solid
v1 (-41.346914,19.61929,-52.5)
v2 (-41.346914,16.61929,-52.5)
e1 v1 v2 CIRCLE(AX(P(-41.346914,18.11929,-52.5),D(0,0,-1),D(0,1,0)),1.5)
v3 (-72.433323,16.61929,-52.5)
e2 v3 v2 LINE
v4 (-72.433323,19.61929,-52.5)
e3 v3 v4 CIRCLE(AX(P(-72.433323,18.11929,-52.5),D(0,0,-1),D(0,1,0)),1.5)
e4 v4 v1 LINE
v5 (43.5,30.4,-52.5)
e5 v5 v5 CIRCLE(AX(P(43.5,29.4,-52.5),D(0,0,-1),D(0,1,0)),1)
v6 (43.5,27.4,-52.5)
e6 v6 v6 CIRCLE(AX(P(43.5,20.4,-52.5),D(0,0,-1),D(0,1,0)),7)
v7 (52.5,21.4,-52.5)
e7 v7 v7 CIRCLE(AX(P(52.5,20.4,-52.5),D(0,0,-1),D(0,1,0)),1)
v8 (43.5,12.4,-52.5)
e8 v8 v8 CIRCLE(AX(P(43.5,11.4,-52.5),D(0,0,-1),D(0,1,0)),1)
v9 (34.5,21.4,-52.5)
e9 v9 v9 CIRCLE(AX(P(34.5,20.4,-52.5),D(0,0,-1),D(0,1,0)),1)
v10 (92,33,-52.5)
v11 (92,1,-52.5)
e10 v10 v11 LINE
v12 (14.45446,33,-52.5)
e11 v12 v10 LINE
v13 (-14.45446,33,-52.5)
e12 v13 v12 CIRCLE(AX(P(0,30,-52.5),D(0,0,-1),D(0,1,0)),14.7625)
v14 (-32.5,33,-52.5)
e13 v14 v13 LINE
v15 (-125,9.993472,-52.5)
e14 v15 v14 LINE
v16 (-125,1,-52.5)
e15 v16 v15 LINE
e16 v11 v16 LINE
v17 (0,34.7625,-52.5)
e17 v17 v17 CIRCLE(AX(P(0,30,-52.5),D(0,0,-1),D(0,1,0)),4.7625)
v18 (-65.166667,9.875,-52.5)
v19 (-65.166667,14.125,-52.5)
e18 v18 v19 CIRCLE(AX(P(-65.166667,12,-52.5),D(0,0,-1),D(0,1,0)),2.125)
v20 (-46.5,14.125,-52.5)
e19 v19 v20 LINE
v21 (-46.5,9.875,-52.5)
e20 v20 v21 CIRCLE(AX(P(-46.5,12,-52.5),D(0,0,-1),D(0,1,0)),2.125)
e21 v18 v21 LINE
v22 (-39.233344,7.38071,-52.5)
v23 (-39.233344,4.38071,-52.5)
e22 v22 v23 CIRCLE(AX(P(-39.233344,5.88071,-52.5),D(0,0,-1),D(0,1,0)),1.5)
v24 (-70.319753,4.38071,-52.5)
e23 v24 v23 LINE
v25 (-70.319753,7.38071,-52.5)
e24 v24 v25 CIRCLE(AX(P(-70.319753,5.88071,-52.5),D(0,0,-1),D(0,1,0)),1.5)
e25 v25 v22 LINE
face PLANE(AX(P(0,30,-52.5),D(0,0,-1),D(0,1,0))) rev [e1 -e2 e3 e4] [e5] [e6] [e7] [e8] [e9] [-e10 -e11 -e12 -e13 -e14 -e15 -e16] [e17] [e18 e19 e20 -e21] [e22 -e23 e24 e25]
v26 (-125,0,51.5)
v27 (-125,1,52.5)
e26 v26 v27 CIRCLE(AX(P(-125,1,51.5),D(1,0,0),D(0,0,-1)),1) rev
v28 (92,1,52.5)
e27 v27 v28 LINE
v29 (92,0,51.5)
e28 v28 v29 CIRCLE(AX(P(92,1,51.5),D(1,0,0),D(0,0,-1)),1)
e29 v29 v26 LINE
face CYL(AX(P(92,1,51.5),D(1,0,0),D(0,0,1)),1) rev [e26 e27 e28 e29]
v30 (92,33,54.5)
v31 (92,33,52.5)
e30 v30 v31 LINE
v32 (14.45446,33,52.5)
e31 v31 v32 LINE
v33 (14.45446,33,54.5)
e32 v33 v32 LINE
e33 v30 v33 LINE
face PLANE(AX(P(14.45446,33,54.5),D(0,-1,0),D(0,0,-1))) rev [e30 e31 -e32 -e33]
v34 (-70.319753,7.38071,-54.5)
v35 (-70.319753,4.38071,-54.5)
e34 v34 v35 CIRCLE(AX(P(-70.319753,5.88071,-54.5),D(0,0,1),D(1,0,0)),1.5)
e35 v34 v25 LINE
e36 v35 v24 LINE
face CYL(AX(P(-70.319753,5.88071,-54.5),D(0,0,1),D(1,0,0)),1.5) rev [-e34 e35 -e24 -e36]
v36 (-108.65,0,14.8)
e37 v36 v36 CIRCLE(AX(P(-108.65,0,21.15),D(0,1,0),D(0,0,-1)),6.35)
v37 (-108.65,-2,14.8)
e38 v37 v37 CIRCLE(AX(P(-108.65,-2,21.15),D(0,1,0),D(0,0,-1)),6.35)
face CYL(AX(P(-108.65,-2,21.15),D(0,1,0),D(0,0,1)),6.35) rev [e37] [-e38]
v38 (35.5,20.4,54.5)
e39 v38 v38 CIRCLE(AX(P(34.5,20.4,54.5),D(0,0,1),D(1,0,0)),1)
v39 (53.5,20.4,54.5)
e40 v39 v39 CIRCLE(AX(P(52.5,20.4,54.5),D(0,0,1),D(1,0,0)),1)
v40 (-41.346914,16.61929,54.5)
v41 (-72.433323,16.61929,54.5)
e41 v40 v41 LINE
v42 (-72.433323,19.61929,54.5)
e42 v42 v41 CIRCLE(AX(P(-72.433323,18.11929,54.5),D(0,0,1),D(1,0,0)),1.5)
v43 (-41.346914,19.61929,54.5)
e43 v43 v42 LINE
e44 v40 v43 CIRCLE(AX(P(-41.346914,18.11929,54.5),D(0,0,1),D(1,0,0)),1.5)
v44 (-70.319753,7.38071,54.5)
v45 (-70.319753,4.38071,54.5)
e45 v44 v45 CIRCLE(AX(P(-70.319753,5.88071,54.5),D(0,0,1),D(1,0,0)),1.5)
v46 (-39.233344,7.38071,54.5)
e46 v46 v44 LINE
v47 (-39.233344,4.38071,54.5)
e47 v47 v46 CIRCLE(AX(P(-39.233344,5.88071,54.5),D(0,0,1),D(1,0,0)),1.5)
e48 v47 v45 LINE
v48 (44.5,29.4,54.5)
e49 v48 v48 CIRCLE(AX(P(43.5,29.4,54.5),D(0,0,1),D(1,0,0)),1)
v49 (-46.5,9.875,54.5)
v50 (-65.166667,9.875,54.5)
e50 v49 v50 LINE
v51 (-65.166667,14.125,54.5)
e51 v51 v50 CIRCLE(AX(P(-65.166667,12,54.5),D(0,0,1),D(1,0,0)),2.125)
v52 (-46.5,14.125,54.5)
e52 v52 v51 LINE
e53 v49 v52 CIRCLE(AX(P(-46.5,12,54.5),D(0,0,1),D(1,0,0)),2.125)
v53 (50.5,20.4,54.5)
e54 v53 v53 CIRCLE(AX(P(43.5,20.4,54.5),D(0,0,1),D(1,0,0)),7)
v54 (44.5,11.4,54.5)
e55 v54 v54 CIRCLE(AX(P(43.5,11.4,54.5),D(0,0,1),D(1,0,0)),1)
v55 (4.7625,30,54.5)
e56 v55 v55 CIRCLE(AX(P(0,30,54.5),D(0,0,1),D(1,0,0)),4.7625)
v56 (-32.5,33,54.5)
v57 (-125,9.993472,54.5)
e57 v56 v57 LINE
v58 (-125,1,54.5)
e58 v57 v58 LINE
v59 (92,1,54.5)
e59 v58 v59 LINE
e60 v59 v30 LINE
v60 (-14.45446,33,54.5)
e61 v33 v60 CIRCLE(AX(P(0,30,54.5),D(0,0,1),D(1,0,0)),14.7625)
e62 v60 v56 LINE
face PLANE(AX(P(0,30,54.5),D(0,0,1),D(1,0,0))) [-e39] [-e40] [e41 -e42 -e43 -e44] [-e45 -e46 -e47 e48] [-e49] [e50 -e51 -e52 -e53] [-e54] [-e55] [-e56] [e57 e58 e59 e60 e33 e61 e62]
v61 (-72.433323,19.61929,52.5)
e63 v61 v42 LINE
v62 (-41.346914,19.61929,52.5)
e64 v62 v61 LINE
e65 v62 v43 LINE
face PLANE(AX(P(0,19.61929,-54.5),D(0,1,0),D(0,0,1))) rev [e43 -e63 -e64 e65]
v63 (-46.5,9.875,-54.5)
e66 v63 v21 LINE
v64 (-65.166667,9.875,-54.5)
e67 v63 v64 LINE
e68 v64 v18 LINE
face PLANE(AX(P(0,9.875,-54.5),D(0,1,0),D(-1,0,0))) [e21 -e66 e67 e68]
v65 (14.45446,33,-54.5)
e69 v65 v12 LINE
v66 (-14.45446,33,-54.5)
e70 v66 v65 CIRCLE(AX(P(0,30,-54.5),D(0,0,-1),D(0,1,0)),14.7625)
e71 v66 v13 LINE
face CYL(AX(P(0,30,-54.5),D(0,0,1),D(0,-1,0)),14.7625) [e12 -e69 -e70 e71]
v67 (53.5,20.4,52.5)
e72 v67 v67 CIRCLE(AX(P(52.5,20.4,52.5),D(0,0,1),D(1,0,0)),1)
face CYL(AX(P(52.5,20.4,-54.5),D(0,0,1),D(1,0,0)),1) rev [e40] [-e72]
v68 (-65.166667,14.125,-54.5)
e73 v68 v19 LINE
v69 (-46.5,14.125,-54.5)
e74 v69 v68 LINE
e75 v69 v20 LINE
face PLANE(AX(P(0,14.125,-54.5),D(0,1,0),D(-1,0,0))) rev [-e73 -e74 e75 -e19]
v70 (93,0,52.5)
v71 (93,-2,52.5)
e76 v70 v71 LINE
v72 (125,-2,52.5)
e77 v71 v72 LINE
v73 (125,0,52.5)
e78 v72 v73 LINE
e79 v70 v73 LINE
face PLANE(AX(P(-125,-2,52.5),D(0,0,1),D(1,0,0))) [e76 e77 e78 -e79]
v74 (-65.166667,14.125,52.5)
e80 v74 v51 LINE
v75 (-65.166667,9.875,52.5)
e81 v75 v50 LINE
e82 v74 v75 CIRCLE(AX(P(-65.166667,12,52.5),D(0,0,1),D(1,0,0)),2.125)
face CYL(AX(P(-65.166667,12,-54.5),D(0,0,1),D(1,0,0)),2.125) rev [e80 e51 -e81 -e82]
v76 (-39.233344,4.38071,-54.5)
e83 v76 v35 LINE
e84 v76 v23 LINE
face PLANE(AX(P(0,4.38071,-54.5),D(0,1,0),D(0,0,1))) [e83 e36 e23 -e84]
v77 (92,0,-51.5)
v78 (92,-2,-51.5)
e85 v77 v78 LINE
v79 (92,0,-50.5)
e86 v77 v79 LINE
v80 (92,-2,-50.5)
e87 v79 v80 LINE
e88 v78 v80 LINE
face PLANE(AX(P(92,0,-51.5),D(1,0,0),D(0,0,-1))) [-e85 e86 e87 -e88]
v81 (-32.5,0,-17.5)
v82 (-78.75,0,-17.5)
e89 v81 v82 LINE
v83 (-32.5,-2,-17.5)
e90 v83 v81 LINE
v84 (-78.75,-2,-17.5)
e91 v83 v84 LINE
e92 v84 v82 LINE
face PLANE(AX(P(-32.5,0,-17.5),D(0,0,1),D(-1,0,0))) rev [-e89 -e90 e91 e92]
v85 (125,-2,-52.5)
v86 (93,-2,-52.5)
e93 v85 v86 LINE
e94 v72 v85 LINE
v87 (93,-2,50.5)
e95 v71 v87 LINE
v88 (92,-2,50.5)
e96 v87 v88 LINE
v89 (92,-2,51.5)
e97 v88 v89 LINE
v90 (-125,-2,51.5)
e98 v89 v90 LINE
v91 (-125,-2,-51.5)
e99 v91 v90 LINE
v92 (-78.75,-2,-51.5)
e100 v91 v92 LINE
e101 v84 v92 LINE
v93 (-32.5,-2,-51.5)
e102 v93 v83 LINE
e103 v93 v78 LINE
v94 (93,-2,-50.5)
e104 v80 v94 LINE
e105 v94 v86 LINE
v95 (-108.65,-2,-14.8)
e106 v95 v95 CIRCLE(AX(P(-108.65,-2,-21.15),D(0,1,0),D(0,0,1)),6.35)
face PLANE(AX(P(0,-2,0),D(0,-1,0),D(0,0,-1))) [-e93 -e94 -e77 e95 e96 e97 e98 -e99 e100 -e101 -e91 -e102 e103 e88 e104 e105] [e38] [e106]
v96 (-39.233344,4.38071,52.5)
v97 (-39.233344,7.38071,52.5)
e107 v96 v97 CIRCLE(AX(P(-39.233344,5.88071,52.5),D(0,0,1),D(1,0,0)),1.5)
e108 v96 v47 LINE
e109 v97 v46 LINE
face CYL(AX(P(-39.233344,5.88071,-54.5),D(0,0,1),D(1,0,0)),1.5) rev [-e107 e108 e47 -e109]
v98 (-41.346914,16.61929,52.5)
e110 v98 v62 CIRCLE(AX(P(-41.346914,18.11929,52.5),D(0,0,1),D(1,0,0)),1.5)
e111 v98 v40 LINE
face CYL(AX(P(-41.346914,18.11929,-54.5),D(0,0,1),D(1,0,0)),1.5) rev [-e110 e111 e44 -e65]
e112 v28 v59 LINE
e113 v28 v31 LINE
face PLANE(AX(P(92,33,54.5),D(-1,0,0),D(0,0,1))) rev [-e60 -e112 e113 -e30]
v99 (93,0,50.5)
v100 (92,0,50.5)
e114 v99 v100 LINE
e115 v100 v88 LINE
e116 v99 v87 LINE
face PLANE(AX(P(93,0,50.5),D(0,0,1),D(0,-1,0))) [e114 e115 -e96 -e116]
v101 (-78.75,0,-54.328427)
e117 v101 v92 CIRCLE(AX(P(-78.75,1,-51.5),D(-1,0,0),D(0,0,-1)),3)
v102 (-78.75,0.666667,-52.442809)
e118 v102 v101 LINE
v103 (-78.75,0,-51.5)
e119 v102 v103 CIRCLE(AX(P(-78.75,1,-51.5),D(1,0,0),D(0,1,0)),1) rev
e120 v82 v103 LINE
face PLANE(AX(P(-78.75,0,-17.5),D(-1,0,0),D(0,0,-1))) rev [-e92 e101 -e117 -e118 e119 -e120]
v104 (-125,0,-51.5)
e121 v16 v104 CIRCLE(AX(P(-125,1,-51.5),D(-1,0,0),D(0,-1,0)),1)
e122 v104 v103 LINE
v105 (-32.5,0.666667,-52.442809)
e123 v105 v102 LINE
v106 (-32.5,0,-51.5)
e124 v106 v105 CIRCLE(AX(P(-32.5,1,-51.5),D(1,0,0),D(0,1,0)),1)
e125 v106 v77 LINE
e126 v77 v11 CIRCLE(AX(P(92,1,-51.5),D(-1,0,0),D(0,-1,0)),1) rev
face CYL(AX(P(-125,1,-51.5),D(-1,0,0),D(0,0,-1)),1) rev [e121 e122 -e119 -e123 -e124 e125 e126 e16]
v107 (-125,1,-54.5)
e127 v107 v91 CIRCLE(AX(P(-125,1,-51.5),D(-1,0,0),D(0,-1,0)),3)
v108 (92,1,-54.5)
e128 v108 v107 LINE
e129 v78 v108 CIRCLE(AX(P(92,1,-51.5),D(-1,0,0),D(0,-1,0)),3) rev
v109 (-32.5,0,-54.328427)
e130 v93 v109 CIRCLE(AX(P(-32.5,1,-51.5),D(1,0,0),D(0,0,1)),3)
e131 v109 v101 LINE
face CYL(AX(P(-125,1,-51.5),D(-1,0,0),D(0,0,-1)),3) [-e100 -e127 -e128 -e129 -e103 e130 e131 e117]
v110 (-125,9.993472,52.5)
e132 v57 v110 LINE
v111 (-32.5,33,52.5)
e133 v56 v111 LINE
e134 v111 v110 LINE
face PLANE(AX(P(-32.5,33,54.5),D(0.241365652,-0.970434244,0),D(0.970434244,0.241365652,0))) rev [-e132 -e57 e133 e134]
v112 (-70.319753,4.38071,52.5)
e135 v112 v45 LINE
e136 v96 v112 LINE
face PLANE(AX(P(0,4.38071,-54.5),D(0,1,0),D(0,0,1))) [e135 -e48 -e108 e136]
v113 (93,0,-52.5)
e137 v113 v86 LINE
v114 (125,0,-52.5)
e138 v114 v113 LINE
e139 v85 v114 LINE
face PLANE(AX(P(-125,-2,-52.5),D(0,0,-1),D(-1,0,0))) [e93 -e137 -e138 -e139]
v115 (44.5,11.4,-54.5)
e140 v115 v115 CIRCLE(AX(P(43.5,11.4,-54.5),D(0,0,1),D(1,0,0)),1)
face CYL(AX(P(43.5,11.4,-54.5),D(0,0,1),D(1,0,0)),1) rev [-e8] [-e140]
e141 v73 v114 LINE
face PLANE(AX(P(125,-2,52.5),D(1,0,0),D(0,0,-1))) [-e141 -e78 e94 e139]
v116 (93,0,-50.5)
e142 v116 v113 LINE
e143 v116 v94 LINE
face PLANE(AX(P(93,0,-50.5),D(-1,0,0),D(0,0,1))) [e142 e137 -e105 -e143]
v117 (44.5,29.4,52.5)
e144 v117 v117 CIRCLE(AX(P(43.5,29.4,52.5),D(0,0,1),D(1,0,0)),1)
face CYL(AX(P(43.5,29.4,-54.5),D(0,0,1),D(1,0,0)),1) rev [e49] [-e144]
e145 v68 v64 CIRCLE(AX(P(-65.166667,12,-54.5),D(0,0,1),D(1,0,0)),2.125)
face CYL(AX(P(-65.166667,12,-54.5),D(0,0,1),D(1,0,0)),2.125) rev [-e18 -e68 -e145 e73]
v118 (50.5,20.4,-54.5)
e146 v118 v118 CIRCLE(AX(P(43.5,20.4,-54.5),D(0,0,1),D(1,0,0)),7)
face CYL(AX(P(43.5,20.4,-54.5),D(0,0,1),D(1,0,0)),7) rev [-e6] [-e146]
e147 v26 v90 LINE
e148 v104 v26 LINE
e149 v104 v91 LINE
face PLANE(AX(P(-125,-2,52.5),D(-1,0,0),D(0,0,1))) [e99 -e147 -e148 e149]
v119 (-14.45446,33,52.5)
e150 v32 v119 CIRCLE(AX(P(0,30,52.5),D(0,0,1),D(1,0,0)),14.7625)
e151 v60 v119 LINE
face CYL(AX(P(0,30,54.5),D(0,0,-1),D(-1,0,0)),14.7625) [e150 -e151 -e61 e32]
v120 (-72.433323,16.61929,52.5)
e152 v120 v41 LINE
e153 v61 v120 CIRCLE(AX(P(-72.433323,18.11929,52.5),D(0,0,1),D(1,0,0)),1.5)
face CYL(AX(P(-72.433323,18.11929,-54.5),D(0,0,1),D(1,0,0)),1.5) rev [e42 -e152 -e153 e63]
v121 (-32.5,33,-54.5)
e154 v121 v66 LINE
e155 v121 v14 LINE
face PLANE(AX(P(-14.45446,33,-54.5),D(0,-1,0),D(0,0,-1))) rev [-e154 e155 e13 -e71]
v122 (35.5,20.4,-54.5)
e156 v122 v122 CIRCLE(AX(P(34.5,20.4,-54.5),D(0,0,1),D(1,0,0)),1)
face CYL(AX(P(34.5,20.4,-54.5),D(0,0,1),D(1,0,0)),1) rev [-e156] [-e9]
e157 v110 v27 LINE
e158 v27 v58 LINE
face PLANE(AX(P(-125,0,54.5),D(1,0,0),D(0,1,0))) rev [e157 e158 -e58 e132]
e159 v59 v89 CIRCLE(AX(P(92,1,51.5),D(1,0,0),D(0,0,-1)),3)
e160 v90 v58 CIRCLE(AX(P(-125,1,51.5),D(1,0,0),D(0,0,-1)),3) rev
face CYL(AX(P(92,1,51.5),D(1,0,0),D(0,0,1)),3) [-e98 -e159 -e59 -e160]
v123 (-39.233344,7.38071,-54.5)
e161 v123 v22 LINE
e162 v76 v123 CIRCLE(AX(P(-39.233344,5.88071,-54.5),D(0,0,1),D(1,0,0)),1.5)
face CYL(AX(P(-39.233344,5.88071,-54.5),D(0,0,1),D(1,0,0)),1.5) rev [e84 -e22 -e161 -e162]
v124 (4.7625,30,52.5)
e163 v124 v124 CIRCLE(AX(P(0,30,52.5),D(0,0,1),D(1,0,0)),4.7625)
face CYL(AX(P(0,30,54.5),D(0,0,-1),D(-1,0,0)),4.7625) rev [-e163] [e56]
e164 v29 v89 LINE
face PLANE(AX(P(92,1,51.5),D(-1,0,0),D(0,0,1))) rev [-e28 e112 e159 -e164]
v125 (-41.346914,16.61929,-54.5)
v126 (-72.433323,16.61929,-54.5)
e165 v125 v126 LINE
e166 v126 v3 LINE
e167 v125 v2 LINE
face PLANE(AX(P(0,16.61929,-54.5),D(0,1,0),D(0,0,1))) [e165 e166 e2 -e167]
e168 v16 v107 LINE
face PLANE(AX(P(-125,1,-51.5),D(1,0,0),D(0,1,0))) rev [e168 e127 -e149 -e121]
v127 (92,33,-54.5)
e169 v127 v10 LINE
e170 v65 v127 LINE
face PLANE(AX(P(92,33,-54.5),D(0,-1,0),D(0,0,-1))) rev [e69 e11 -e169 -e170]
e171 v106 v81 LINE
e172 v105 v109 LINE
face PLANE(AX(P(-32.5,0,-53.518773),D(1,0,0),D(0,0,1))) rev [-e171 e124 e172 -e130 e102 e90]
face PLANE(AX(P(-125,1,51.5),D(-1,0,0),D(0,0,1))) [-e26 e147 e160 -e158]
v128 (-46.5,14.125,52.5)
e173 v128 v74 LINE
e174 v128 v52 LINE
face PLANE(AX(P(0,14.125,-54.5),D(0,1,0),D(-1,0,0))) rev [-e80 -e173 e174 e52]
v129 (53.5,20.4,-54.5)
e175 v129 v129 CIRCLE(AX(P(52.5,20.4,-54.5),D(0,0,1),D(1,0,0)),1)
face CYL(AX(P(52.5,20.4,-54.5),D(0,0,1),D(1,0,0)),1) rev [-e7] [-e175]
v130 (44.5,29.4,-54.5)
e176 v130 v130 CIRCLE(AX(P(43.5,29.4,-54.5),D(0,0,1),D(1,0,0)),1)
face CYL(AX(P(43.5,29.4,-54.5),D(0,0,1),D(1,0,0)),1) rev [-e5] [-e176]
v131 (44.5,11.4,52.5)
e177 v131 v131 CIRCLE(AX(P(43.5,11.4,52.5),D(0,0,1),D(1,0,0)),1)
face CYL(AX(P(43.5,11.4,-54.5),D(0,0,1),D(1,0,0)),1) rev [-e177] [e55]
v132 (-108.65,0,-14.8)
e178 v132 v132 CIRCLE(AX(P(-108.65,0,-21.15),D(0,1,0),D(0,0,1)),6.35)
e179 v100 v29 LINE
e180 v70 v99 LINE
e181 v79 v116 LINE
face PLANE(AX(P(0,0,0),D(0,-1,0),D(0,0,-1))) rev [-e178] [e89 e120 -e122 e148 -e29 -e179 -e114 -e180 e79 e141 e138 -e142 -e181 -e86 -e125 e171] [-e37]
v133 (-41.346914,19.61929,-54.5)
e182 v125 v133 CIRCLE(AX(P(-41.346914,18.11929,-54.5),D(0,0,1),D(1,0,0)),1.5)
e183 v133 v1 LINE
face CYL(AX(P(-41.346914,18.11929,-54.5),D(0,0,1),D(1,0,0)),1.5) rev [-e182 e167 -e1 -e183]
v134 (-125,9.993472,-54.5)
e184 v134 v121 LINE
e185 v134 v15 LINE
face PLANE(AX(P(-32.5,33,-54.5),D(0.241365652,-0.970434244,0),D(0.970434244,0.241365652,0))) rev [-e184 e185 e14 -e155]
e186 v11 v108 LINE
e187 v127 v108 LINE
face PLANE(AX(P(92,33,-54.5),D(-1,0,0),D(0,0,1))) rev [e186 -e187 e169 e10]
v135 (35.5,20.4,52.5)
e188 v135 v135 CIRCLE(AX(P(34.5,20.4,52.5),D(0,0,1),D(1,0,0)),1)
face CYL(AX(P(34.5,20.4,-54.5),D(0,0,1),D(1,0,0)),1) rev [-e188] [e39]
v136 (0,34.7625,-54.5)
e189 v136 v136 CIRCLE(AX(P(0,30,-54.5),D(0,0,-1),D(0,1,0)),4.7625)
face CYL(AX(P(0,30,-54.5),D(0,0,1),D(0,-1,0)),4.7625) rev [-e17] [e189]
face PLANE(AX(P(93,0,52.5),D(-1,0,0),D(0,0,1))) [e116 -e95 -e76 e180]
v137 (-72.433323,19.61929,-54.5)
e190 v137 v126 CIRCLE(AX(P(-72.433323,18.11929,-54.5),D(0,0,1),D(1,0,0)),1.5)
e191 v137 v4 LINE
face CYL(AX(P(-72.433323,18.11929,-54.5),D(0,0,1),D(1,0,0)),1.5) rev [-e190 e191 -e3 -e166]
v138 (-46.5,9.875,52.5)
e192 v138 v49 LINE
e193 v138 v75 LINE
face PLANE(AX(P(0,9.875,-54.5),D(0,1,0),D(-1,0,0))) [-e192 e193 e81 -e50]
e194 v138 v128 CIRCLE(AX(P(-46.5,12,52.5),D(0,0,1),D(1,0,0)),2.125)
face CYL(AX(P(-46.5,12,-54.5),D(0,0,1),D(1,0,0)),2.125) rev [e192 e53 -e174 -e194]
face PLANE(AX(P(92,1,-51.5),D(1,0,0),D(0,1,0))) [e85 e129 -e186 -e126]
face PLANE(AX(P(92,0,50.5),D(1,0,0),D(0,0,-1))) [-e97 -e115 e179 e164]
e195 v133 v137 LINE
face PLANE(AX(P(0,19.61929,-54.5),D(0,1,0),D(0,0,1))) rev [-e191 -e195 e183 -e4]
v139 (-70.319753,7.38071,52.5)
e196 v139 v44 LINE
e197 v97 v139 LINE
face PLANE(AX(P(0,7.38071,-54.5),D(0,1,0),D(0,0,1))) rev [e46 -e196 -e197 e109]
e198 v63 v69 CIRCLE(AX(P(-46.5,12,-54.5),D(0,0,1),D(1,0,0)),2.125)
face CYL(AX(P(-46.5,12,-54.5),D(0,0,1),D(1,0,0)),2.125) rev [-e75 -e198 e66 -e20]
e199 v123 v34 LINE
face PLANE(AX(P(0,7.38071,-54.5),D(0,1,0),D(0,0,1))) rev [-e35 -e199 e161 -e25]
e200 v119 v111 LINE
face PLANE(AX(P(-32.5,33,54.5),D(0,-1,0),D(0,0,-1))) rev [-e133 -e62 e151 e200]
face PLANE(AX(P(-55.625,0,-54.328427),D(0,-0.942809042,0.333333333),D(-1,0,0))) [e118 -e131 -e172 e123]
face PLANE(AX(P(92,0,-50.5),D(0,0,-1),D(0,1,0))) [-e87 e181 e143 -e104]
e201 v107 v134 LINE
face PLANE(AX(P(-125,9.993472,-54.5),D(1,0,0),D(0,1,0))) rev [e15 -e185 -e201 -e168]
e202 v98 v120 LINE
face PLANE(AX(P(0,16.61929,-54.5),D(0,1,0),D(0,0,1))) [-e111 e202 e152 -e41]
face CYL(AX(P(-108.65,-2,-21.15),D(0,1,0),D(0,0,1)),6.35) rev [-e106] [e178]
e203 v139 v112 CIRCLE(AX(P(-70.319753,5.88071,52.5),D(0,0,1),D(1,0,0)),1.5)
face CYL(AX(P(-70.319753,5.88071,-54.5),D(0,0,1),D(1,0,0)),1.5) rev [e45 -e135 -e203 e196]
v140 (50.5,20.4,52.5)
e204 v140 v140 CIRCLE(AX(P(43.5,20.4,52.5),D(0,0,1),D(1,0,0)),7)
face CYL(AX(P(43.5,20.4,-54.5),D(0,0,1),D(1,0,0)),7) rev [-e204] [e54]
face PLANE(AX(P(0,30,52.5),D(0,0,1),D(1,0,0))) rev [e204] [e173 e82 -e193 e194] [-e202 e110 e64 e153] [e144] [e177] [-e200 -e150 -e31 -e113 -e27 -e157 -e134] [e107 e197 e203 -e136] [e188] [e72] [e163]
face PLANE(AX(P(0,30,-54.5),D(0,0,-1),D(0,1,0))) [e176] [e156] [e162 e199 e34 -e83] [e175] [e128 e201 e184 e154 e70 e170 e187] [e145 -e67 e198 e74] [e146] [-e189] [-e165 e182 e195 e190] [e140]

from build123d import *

# Parameters (mm, degrees)
SKETCH3_W                       = 250
SKETCH3_H                       = 105
SKETCH3_R                       = 6.35
BASE_FLANGE1_DEPTH              = 2
EDGE_FLANGE1_STRIP_W            = 10
EDGE_FLANGE1_STRIP_H            = 2
EDGE_FLANGE1_STRIP_CUT_DEPTH    = 217
EDGE_FLANGE1_RELIEF_W           = 11
EDGE_FLANGE1_RELIEF_H           = 1
EDGE_FLANGE1_RELIEF_CUT_DEPTH   = 2
EDGE_FLANGE1_STRIP_2_W          = 10
EDGE_FLANGE1_STRIP_2_H          = 2
EDGE_FLANGE1_STRIP_CUT_2_DEPTH  = 217
EDGE_FLANGE1_RELIEF_2_W         = 11
EDGE_FLANGE1_RELIEF_2_H         = 1
EDGE_FLANGE1_RELIEF_CUT_2_DEPTH = 2
EDGE_FLANGE1_DEPTH              = 217
EDGE_FLANGE1_START              = 2
EDGE_FLANGE1_PROFILE_R          = 4.7625
EDGE_FLANGE1_FLAT_DEPTH         = 2
EDGE_FLANGE1_BEND_DEPTH         = 217
EDGE_FLANGE1_PROFILE_2_R        = 4.7625
EDGE_FLANGE1_FLAT_2_DEPTH       = 2
CUT_EXTRUDE2_START              = -78.75
CUT_EXTRUDE2_DEPTH              = 46.25
CUT_EXTRUDE1_DEPTH              = 144.523278273
CUT_EXTRUDE1_DEPTH_BACK         = 144.523278273
SKETCH14_R                      = 1
SKETCH14_R_2                    = 7


# Read off the part's stored shape, not the designer's step: Cut-Extrude2
# Sheet-metal steps are written as plain solids
with BuildPart() as part:
    # Sketch3 → Base-Flange1 (new body)
    with BuildSketch(Plane(origin=(0, 0, 0), x_dir=(1, 0, 0), z_dir=(0, 1, 0))):
        Rectangle(SKETCH3_W, SKETCH3_H)
        with Locations(Location((-108.65, 21.15, 0), (0, 0, 270))):
            Circle(SKETCH3_R, mode=Mode.SUBTRACT)
        with Locations(Location((-108.65, -21.15, 0), (0, 0, 90))):
            Circle(SKETCH3_R, mode=Mode.SUBTRACT)
    extrude(amount=-BASE_FLANGE1_DEPTH)

    # Edge-Flange1 strip (across the edge) → Edge-Flange1 strip cut (cut)
    with BuildSketch(Plane(origin=(-125, 0, 52.5), x_dir=(0, 0, -1), z_dir=(1, 0, 0))):
        with Locations((-4, -1)):
            Rectangle(EDGE_FLANGE1_STRIP_W, EDGE_FLANGE1_STRIP_H)
    extrude(amount=EDGE_FLANGE1_STRIP_CUT_DEPTH, mode=Mode.SUBTRACT)

    # Edge-Flange1 relief (on the sheet) → Edge-Flange1 relief cut (cut)
    with BuildSketch(Plane(origin=(-125, 0, 51.5), x_dir=(0, 0, -1), z_dir=(0, 1, 0))):
        with Locations((-4.5, -217.5)):
            Rectangle(EDGE_FLANGE1_RELIEF_W, EDGE_FLANGE1_RELIEF_H)
    extrude(amount=-EDGE_FLANGE1_RELIEF_CUT_DEPTH, mode=Mode.SUBTRACT)

    # Edge-Flange1 strip 2 (across the edge) → Edge-Flange1 strip cut 2 (cut)
    with BuildSketch(Plane(origin=(92, 0, -52.5), x_dir=(0, 0, 1), z_dir=(-1, 0, 0))):
        with Locations((-4, -1)):
            Rectangle(EDGE_FLANGE1_STRIP_2_W, EDGE_FLANGE1_STRIP_2_H)
    extrude(amount=EDGE_FLANGE1_STRIP_CUT_2_DEPTH, mode=Mode.SUBTRACT)

    # Edge-Flange1 relief 2 (on the sheet) → Edge-Flange1 relief cut 2 (cut)
    with BuildSketch(Plane(origin=(92, 0, -51.5), x_dir=(0, 0, 1), z_dir=(0, 1, 0))):
        with Locations((-4.5, 0.5)):
            Rectangle(EDGE_FLANGE1_RELIEF_2_W, EDGE_FLANGE1_RELIEF_2_H)
    extrude(amount=-EDGE_FLANGE1_RELIEF_CUT_2_DEPTH, mode=Mode.SUBTRACT)

    # Edge-Flange1 bend section (across the edge) → Edge-Flange1 (add)
    with BuildSketch(Plane(origin=(-125, 0, 52.5), x_dir=(0, 0, -1), z_dir=(1, 0, 0))):
        with BuildLine():
            Line((-2, 1), (0, 1))
            ThreePointArc((0, 1), (0.292893219, 0.292893219), (1, 0))
            Line((1, 0), (1, -2))
            ThreePointArc((1, -2), (-1.121320344, -1.121320344), (-2, 1))
        make_face()
    extrude(amount=EDGE_FLANGE1_DEPTH)

    # Edge-Flange1 profile (on flange) → Edge-Flange1 flat (add)
    with BuildSketch(Plane.XY.offset(52.5).offset(EDGE_FLANGE1_START)):
        with BuildLine():
            Line((-125, 9.993471807), (-125, 1))
            Line((-125, 1), (92, 1))
            Line((92, 1), (92, 33))
            Line((92, 33), (14.454459736, 33))
            ThreePointArc((14.454459736, 33), (0, 44.7625), (-14.454459736, 33))
            Line((-14.454459736, 33), (-32.5, 33))
            Line((-32.5, 33), (-125, 9.993471807))
        make_face()
        with Locations((0, 30)):
            Circle(EDGE_FLANGE1_PROFILE_R, mode=Mode.SUBTRACT)
    extrude(amount=-EDGE_FLANGE1_FLAT_DEPTH)

    # Edge-Flange1 bend section 2 (across the edge) → Edge-Flange1 bend (add)
    with BuildSketch(Plane(origin=(92, 0, -52.5), x_dir=(0, 0, 1), z_dir=(-1, 0, 0))):
        with BuildLine():
            Line((-2, 1), (0, 1))
            ThreePointArc((0, 1), (0.292893219, 0.292893219), (1, 0))
            Line((1, 0), (1, -2))
            ThreePointArc((1, -2), (-1.121320344, -1.121320344), (-2, 1))
        make_face()
    extrude(amount=EDGE_FLANGE1_BEND_DEPTH)

    # Edge-Flange1 profile 2 (on flange) → Edge-Flange1 flat 2 (add)
    with BuildSketch(Plane(origin=(0, 0, -52.5), x_dir=(-1, 0, 0), z_dir=(0, 0, -1)).offset(EDGE_FLANGE1_START)):
        with BuildLine():
            ThreePointArc((14.454459736, 33), (0, 44.7625), (-14.454459736, 33))
            Line((-14.454459736, 33), (-92, 33))
            Line((-92, 33), (-92, 1))
            Line((-92, 1), (125, 1))
            Line((125, 1), (125, 9.993471807))
            Line((125, 9.993471807), (32.5, 33))
            Line((32.5, 33), (14.454459736, 33))
        make_face()
        with Locations((0, 30)):
            Circle(EDGE_FLANGE1_PROFILE_2_R, mode=Mode.SUBTRACT)
    extrude(amount=-EDGE_FLANGE1_FLAT_2_DEPTH)

    # Cut-Extrude2 outline → Cut-Extrude2 (cut)
    with BuildSketch(Plane.YZ.offset(CUT_EXTRUDE2_START)):
        with BuildLine():
            Line((0, -54.328427125), (0.666666667, -52.442809042))
            ThreePointArc((0.666666667, -52.442809042), (0.183503419, -52.077350269), (0, -51.5))
            Line((0, -51.5), (0, -17.5))
            Line((0, -17.5), (-2, -17.5))
            Line((-2, -17.5), (-2, -51.5))
            ThreePointArc((-2, -51.5), (-1.449489743, -53.232050808), (0, -54.328427125))
        make_face()
    extrude(amount=CUT_EXTRUDE2_DEPTH, mode=Mode.SUBTRACT)

    # Sketch14 → Cut-Extrude1 (cut, two sides: drawn at the far end of the back side and taken through both)
    with BuildSketch(Plane.XY.offset(-CUT_EXTRUDE1_DEPTH_BACK)):
        with BuildLine():
            Line((-46.5, 14.125), (-65.166666667, 14.125))
            ThreePointArc((-65.166666667, 14.125), (-67.291666667, 12), (-65.166666667, 9.875))
            Line((-65.166666667, 9.875), (-46.5, 9.875))
            ThreePointArc((-46.5, 9.875), (-44.375, 12), (-46.5, 14.125))
        make_face()
        with BuildLine():
            Line((-57.900010285, 4.380710415), (-51.653085966, 4.380710415))
            ThreePointArc((-51.653085966, 4.380710415), (-50.153085966, 5.880710415), (-51.653085966, 7.380710415))
            Line((-51.653085966, 7.380710415), (-57.900010285, 7.380710415))
            ThreePointArc((-57.900010285, 7.380710415), (-59.400010285, 5.880710415), (-57.900010285, 4.380710415))
        make_face()
        with BuildLine():
            Line((-51.653085966, 4.380710415), (-39.233343618, 4.380710415))
            ThreePointArc((-39.233343618, 4.380710415), (-37.733343618, 5.880710415), (-39.233343618, 7.380710415))
            Line((-39.233343618, 7.380710415), (-51.653085966, 7.380710415))
            ThreePointArc((-51.653085966, 7.380710415), (-50.153085966, 5.880710415), (-51.653085966, 4.380710415))
        make_face()
        with BuildLine():
            Line((-70.319752633, 4.380710415), (-57.900010285, 4.380710415))
            ThreePointArc((-57.900010285, 4.380710415), (-59.400010285, 5.880710415), (-57.900010285, 7.380710415))
            Line((-57.900010285, 7.380710415), (-70.319752633, 7.380710415))
            ThreePointArc((-70.319752633, 7.380710415), (-71.819752633, 5.880710415), (-70.319752633, 4.380710415))
        make_face()
        with BuildLine():
            Line((-72.433323049, 16.619289585), (-60.0135807, 16.619289585))
            ThreePointArc((-60.0135807, 16.619289585), (-61.5135807, 18.119289585), (-60.0135807, 19.619289585))
            Line((-60.0135807, 19.619289585), (-72.433323049, 19.619289585))
            ThreePointArc((-72.433323049, 19.619289585), (-73.933323049, 18.119289585), (-72.433323049, 16.619289585))
        make_face()
        with BuildLine():
            Line((-60.0135807, 16.619289585), (-53.766656382, 16.619289585))
            ThreePointArc((-53.766656382, 16.619289585), (-52.266656382, 18.119289585), (-53.766656382, 19.619289585))
            Line((-53.766656382, 19.619289585), (-60.0135807, 19.619289585))
            ThreePointArc((-60.0135807, 19.619289585), (-61.5135807, 18.119289585), (-60.0135807, 16.619289585))
        make_face()
        with BuildLine():
            ThreePointArc((-53.766656382, 19.619289585), (-52.266656382, 18.119289585), (-53.766656382, 16.619289585))
            Line((-53.766656382, 16.619289585), (-41.346914034, 16.619289585))
            ThreePointArc((-41.346914034, 16.619289585), (-39.846914034, 18.119289585), (-41.346914034, 19.619289585))
            Line((-41.346914034, 19.619289585), (-53.766656382, 19.619289585))
        make_face()
        with Locations((43.5, 11.4)):
            Circle(SKETCH14_R)
        with Locations((52.5, 20.4)):
            Circle(SKETCH14_R)
        with Locations((43.5, 20.4)):
            Circle(SKETCH14_R_2)
        with Locations((34.5, 20.4)):
            Circle(SKETCH14_R)
        with Locations((43.5, 29.4)):
            Circle(SKETCH14_R)
    extrude(amount=CUT_EXTRUDE1_DEPTH + CUT_EXTRUDE1_DEPTH_BACK, mode=Mode.SUBTRACT)


solid = part.part
